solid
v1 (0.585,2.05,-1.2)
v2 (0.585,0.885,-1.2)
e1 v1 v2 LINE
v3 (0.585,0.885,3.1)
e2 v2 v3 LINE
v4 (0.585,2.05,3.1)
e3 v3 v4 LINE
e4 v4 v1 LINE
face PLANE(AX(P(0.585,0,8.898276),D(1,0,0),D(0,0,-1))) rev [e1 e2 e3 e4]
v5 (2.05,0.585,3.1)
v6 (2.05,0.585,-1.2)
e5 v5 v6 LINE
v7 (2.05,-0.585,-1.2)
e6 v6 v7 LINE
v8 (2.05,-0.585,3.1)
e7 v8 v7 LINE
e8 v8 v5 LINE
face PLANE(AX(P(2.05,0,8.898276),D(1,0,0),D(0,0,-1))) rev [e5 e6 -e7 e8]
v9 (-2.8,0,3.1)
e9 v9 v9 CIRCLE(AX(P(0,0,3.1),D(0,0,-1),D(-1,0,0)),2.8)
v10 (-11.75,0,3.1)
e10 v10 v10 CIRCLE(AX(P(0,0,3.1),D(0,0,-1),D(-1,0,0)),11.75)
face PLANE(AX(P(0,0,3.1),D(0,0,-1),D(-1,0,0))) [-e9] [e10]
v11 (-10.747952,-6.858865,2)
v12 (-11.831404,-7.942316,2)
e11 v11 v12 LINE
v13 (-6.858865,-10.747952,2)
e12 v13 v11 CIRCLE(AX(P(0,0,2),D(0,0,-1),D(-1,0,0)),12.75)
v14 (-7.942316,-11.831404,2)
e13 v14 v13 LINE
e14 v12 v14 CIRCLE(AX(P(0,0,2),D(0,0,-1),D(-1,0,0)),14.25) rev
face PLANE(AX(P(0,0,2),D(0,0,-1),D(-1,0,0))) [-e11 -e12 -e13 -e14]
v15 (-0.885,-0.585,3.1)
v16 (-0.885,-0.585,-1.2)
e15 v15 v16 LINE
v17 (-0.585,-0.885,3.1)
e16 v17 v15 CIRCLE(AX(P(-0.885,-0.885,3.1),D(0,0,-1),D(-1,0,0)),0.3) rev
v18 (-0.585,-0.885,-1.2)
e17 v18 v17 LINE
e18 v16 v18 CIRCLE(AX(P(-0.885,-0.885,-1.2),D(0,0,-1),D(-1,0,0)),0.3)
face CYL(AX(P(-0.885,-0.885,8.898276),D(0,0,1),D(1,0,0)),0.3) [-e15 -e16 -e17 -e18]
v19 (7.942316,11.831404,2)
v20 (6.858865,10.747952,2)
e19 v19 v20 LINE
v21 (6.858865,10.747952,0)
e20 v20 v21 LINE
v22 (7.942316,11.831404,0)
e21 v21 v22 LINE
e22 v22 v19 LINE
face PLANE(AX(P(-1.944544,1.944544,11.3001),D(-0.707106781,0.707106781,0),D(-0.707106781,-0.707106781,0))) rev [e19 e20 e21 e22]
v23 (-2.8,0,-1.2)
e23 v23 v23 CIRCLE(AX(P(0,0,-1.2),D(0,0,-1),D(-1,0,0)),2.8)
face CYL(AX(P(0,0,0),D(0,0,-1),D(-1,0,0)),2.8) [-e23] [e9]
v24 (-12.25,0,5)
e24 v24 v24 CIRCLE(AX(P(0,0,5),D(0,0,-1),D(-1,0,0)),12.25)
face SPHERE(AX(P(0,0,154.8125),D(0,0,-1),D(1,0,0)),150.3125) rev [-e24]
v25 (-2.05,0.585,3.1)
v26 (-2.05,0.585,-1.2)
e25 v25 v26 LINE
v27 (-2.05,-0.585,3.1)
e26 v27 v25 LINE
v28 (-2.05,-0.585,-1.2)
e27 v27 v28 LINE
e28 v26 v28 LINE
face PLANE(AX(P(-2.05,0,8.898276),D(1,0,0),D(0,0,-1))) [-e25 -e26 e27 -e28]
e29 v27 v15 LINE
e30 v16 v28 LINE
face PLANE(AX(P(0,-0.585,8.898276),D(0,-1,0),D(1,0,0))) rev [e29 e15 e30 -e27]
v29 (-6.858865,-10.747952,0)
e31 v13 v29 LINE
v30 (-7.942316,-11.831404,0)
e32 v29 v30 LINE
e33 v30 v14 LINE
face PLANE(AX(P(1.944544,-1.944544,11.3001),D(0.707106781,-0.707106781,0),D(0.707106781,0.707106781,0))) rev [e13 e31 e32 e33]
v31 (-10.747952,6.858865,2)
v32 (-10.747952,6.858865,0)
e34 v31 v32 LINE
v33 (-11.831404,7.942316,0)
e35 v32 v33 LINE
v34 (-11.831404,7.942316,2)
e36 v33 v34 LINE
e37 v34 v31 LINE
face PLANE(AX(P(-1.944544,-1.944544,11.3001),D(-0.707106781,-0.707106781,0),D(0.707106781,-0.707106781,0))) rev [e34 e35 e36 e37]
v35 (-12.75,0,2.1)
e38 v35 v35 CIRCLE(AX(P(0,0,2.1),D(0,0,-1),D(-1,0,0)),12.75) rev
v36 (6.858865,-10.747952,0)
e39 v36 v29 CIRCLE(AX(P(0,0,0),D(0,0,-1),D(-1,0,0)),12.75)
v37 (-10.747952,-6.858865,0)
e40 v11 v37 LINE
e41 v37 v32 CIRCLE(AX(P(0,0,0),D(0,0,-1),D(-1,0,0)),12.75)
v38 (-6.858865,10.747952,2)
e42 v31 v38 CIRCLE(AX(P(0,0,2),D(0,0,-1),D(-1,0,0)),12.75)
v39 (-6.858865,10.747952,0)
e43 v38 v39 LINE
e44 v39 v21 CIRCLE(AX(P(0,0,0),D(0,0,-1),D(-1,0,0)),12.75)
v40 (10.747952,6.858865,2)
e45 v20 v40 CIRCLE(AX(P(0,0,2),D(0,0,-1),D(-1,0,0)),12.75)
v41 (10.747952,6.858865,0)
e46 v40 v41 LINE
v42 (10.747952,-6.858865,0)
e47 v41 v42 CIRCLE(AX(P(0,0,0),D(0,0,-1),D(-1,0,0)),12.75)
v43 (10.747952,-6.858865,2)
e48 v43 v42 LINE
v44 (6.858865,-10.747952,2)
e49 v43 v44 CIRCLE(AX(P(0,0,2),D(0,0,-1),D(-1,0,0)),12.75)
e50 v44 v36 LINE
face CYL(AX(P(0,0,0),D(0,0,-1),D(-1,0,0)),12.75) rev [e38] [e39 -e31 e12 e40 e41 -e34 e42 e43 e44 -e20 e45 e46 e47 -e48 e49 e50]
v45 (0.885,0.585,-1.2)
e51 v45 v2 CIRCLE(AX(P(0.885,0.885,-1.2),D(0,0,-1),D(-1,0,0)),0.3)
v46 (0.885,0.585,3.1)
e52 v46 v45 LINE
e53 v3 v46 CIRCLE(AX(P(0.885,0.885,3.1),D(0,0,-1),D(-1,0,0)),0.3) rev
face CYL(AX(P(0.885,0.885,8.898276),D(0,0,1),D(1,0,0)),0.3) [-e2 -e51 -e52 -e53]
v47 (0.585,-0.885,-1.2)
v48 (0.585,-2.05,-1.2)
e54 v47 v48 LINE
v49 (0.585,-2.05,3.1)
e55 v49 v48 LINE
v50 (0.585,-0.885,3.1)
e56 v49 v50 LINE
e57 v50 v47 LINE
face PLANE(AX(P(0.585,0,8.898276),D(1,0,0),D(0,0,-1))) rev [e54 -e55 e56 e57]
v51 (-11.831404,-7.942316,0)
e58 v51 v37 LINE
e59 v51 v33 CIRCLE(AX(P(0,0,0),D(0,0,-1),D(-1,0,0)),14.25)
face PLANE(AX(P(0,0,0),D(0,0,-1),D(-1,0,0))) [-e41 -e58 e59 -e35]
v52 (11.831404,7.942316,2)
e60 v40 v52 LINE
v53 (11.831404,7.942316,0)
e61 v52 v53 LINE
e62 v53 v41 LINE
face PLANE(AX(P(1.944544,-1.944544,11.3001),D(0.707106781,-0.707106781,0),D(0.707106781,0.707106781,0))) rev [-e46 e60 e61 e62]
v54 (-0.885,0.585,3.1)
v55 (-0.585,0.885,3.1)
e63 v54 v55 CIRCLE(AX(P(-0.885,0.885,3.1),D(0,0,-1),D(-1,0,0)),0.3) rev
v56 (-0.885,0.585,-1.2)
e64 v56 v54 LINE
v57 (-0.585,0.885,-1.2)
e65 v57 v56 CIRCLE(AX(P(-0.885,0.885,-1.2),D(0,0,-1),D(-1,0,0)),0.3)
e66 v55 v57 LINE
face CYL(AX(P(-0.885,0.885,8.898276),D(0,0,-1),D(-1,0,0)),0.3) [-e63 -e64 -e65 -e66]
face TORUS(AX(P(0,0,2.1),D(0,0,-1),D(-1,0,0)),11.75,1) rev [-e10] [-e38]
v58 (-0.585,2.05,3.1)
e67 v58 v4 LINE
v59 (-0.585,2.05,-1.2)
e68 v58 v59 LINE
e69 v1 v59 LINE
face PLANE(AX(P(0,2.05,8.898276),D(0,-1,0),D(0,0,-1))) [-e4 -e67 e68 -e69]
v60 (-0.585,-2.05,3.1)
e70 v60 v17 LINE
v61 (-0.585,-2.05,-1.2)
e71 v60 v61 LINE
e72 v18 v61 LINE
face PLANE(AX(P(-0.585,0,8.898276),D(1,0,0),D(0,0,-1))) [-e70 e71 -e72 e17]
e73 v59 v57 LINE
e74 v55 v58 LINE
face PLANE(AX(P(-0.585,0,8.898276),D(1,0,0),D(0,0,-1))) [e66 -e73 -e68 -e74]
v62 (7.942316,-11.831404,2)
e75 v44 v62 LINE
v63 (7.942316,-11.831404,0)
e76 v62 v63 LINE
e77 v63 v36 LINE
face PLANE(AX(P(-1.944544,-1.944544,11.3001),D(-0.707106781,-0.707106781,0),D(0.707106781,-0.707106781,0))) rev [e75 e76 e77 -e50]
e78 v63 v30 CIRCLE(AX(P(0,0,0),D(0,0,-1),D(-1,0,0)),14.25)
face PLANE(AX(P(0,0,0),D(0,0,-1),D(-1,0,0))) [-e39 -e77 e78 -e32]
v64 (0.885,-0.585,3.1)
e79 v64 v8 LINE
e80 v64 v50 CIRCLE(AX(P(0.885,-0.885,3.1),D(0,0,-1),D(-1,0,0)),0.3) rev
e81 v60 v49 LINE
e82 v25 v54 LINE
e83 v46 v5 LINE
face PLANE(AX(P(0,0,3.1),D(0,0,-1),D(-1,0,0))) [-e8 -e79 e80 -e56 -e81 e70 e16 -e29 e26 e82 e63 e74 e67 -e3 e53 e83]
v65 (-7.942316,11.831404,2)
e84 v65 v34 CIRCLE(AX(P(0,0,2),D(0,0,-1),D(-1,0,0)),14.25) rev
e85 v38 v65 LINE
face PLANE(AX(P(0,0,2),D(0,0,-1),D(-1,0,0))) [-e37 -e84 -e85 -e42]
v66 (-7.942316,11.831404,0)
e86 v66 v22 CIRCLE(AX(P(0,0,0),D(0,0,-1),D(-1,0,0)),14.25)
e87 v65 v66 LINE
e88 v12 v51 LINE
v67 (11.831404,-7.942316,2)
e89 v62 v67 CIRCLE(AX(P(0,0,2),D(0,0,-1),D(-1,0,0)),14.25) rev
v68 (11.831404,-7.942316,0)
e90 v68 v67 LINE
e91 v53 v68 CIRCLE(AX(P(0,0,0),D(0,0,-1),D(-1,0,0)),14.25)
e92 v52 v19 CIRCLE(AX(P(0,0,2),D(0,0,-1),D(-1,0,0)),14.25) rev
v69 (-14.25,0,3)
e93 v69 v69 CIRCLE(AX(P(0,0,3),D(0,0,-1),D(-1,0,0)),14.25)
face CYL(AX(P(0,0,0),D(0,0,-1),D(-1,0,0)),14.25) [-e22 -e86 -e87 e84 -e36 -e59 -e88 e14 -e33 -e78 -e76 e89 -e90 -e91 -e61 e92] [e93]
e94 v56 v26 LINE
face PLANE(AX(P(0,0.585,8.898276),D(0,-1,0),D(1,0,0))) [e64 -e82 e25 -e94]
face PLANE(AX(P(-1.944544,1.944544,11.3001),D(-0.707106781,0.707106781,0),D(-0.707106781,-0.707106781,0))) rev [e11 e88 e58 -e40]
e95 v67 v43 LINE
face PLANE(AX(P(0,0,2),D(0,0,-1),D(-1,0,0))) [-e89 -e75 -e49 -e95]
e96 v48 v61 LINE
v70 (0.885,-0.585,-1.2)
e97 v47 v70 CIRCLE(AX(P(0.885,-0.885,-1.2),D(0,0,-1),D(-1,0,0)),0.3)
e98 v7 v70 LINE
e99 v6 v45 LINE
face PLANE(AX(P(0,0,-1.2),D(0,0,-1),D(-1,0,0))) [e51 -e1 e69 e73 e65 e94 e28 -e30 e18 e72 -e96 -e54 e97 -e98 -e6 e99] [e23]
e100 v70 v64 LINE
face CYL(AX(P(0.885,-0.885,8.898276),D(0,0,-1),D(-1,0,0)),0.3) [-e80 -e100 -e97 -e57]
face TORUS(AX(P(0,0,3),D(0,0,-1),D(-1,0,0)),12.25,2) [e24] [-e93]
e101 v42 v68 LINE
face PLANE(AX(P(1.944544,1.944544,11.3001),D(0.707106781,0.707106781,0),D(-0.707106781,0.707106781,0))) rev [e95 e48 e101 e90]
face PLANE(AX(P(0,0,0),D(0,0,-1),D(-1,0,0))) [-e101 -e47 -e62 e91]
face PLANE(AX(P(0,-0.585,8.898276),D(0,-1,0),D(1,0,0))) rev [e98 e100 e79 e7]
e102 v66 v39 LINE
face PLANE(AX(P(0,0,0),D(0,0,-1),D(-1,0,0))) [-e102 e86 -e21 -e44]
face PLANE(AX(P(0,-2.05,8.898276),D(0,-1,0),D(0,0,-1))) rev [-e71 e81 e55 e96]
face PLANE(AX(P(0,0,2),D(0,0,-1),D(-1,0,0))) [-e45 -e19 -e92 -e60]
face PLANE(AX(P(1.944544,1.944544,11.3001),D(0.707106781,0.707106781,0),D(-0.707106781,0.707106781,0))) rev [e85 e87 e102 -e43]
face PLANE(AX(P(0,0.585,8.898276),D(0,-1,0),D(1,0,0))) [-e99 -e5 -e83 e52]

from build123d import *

# Parameters (mm, degrees)
SKETCH1_W          = 9.95
SKETCH1_H          = 0.5
SKETCH1_W_2        = 2.8
SKETCH1_H_2        = 1.2
CUT_EXTRUDE2_START = 2
CUT_EXTRUDE2_DEPTH = 2
SKETCH3_W          = 1.17
SKETCH3_H          = 1.465
SKETCH3_H_2        = 1.17
SKETCH3_W_2        = 1.465
CUT_EXTRUDE3_DEPTH = 4.3
FILLET1_R          = 0.3
FILLET2_R          = 1
FILLET3_R          = 2


with BuildPart() as part:
    # Sketch1 → Revolve1 (revolve)
    with BuildSketch(Plane(origin=(0, 0, 0), x_dir=(1, 0, 0), z_dir=(0, 1, 0)), mode=Mode.PRIVATE) as revolve1_sk:
        with BuildLine():
            Line((2.8, 0), (0, 0))
            Line((0, 0), (0, -4.5))
            ThreePointArc((0, -4.5), (6.130099918, -4.625052018), (12.25, -5))
            Line((12.25, -5), (14.25, -5))
            Line((14.25, -5), (14.25, 0))
            Line((14.25, 0), (12.75, 0))
            Line((12.75, 0), (12.75, -3.1))
            Line((12.75, -3.1), (12.75, -3.6))
            Line((12.75, -3.6), (2.8, -3.6))
            Line((2.8, -3.6), (2.8, -3.1))
            Line((2.8, -3.1), (2.8, 0))
        make_face()
        with Locations((7.775, -3.35)):
            Rectangle(SKETCH1_W, SKETCH1_H)
        with Locations((1.4, 0.6)):
            Rectangle(SKETCH1_W_2, SKETCH1_H_2)
    revolve(revolve1_sk.sketch.rotate(Axis((0, 0, 0), (0, 0, 1)), 180), axis=Axis((0, 0, 0), (0, 0, 1)))

    # Sketch2 → Cut-Extrude2 (cut)
    with BuildSketch(Plane.XY.offset(CUT_EXTRUDE2_START)):
        with BuildLine():
            Line((10.747952079, 9.404591185), (9.404591185, 10.747952079))
            Line((9.404591185, 10.747952079), (6.858864783, 10.747952079))
            ThreePointArc((6.858864783, 10.747952079), (9.01561146, 9.01561146), (10.747952079, 6.858864783))
            Line((10.747952079, 6.858864783), (10.747952079, 9.404591185))
        make_face()
        Polygon((9.404591185, 10.747952079), (8.131727984, 12.02081528), (6.858864783, 10.747952079), align=None)
        Polygon((12.02081528, 8.131727984), (10.747952079, 9.404591185), (10.747952079, 6.858864783), align=None)
        Polygon((12.02081528, -8.131727984), (10.747952079, -6.858864783), (10.747952079, -9.404591185), align=None)
        with BuildLine():
            Line((10.747952079, -9.404591185), (10.747952079, -6.858864783))
            ThreePointArc((10.747952079, -6.858864783), (9.01561146, -9.01561146), (6.858864783, -10.747952079))
            Line((6.858864783, -10.747952079), (9.404591185, -10.747952079))
            Line((9.404591185, -10.747952079), (10.747952079, -9.404591185))
        make_face()
        Polygon((9.404591185, -10.747952079), (6.858864783, -10.747952079), (8.131727984, -12.02081528), align=None)
        Polygon((-8.131727984, -12.02081528), (-6.858864783, -10.747952079), (-9.404591185, -10.747952079), align=None)
        with BuildLine():
            ThreePointArc((-6.858864783, -10.747952079), (-9.01561146, -9.01561146), (-10.747952079, -6.858864783))
            Line((-10.747952079, -6.858864783), (-10.747952079, -9.404591185))
            Line((-10.747952079, -9.404591185), (-9.404591185, -10.747952079))
            Line((-9.404591185, -10.747952079), (-6.858864783, -10.747952079))
        make_face()
        Polygon((-10.747952079, -9.404591185), (-10.747952079, -6.858864783), (-12.02081528, -8.131727984), align=None)
        Polygon((-12.02081528, 8.131727984), (-10.747952079, 6.858864783), (-10.747952079, 9.404591185), align=None)
        with BuildLine():
            ThreePointArc((-10.747952079, 6.858864783), (-9.01561146, 9.01561146), (-6.858864783, 10.747952079))
            Line((-6.858864783, 10.747952079), (-9.404591185, 10.747952079))
            Line((-9.404591185, 10.747952079), (-10.747952079, 9.404591185))
            Line((-10.747952079, 9.404591185), (-10.747952079, 6.858864783))
        make_face()
        Polygon((-9.404591185, 10.747952079), (-6.858864783, 10.747952079), (-8.131727984, 12.02081528), align=None)
    extrude(amount=-CUT_EXTRUDE2_DEPTH, mode=Mode.SUBTRACT)

    # Sketch3 → Cut-Extrude3 (cut)
    with BuildSketch(Plane(origin=(0, 0, -1.2), x_dir=(-1, 0, 0), z_dir=(0, 0, -1))):
        with Locations((0, 1.3175)):
            Rectangle(SKETCH3_W, SKETCH3_H)
        Rectangle(SKETCH3_W, SKETCH3_H_2)
        with Locations((0, -1.3175)):
            Rectangle(SKETCH3_W, SKETCH3_H)
        with Locations((-1.3175, 0)):
            Rectangle(SKETCH3_W_2, SKETCH3_H_2)
        with Locations((1.3175, 0)):
            Rectangle(SKETCH3_W_2, SKETCH3_H_2)
    extrude(amount=-CUT_EXTRUDE3_DEPTH, mode=Mode.SUBTRACT)

    # Fillet1
    fillet1_edges = [part.edges().sort_by_distance(p)[0] for p in [
        (0.585, 0.585, 0.95),
        (0.585, -0.585, 0.95),
        (-0.585, -0.585, 0.95),
        (-0.585, 0.585, 0.95),
    ]]
    fillet(fillet1_edges, radius=FILLET1_R)

    # Fillet2
    fillet2_edges = [part.edges().sort_by_distance(p)[0] for p in [
        (12.75, 0, 3.1),
    ]]
    fillet(fillet2_edges, radius=FILLET2_R)

    # Fillet3
    fillet3_edges = [part.edges().sort_by_distance(p)[0] for p in [
        (14.25, 0, 5),
    ]]
    fillet(fillet3_edges, radius=FILLET3_R - 0.0001)  # a hair under: the kernel refuses the full size


solid = part.part
